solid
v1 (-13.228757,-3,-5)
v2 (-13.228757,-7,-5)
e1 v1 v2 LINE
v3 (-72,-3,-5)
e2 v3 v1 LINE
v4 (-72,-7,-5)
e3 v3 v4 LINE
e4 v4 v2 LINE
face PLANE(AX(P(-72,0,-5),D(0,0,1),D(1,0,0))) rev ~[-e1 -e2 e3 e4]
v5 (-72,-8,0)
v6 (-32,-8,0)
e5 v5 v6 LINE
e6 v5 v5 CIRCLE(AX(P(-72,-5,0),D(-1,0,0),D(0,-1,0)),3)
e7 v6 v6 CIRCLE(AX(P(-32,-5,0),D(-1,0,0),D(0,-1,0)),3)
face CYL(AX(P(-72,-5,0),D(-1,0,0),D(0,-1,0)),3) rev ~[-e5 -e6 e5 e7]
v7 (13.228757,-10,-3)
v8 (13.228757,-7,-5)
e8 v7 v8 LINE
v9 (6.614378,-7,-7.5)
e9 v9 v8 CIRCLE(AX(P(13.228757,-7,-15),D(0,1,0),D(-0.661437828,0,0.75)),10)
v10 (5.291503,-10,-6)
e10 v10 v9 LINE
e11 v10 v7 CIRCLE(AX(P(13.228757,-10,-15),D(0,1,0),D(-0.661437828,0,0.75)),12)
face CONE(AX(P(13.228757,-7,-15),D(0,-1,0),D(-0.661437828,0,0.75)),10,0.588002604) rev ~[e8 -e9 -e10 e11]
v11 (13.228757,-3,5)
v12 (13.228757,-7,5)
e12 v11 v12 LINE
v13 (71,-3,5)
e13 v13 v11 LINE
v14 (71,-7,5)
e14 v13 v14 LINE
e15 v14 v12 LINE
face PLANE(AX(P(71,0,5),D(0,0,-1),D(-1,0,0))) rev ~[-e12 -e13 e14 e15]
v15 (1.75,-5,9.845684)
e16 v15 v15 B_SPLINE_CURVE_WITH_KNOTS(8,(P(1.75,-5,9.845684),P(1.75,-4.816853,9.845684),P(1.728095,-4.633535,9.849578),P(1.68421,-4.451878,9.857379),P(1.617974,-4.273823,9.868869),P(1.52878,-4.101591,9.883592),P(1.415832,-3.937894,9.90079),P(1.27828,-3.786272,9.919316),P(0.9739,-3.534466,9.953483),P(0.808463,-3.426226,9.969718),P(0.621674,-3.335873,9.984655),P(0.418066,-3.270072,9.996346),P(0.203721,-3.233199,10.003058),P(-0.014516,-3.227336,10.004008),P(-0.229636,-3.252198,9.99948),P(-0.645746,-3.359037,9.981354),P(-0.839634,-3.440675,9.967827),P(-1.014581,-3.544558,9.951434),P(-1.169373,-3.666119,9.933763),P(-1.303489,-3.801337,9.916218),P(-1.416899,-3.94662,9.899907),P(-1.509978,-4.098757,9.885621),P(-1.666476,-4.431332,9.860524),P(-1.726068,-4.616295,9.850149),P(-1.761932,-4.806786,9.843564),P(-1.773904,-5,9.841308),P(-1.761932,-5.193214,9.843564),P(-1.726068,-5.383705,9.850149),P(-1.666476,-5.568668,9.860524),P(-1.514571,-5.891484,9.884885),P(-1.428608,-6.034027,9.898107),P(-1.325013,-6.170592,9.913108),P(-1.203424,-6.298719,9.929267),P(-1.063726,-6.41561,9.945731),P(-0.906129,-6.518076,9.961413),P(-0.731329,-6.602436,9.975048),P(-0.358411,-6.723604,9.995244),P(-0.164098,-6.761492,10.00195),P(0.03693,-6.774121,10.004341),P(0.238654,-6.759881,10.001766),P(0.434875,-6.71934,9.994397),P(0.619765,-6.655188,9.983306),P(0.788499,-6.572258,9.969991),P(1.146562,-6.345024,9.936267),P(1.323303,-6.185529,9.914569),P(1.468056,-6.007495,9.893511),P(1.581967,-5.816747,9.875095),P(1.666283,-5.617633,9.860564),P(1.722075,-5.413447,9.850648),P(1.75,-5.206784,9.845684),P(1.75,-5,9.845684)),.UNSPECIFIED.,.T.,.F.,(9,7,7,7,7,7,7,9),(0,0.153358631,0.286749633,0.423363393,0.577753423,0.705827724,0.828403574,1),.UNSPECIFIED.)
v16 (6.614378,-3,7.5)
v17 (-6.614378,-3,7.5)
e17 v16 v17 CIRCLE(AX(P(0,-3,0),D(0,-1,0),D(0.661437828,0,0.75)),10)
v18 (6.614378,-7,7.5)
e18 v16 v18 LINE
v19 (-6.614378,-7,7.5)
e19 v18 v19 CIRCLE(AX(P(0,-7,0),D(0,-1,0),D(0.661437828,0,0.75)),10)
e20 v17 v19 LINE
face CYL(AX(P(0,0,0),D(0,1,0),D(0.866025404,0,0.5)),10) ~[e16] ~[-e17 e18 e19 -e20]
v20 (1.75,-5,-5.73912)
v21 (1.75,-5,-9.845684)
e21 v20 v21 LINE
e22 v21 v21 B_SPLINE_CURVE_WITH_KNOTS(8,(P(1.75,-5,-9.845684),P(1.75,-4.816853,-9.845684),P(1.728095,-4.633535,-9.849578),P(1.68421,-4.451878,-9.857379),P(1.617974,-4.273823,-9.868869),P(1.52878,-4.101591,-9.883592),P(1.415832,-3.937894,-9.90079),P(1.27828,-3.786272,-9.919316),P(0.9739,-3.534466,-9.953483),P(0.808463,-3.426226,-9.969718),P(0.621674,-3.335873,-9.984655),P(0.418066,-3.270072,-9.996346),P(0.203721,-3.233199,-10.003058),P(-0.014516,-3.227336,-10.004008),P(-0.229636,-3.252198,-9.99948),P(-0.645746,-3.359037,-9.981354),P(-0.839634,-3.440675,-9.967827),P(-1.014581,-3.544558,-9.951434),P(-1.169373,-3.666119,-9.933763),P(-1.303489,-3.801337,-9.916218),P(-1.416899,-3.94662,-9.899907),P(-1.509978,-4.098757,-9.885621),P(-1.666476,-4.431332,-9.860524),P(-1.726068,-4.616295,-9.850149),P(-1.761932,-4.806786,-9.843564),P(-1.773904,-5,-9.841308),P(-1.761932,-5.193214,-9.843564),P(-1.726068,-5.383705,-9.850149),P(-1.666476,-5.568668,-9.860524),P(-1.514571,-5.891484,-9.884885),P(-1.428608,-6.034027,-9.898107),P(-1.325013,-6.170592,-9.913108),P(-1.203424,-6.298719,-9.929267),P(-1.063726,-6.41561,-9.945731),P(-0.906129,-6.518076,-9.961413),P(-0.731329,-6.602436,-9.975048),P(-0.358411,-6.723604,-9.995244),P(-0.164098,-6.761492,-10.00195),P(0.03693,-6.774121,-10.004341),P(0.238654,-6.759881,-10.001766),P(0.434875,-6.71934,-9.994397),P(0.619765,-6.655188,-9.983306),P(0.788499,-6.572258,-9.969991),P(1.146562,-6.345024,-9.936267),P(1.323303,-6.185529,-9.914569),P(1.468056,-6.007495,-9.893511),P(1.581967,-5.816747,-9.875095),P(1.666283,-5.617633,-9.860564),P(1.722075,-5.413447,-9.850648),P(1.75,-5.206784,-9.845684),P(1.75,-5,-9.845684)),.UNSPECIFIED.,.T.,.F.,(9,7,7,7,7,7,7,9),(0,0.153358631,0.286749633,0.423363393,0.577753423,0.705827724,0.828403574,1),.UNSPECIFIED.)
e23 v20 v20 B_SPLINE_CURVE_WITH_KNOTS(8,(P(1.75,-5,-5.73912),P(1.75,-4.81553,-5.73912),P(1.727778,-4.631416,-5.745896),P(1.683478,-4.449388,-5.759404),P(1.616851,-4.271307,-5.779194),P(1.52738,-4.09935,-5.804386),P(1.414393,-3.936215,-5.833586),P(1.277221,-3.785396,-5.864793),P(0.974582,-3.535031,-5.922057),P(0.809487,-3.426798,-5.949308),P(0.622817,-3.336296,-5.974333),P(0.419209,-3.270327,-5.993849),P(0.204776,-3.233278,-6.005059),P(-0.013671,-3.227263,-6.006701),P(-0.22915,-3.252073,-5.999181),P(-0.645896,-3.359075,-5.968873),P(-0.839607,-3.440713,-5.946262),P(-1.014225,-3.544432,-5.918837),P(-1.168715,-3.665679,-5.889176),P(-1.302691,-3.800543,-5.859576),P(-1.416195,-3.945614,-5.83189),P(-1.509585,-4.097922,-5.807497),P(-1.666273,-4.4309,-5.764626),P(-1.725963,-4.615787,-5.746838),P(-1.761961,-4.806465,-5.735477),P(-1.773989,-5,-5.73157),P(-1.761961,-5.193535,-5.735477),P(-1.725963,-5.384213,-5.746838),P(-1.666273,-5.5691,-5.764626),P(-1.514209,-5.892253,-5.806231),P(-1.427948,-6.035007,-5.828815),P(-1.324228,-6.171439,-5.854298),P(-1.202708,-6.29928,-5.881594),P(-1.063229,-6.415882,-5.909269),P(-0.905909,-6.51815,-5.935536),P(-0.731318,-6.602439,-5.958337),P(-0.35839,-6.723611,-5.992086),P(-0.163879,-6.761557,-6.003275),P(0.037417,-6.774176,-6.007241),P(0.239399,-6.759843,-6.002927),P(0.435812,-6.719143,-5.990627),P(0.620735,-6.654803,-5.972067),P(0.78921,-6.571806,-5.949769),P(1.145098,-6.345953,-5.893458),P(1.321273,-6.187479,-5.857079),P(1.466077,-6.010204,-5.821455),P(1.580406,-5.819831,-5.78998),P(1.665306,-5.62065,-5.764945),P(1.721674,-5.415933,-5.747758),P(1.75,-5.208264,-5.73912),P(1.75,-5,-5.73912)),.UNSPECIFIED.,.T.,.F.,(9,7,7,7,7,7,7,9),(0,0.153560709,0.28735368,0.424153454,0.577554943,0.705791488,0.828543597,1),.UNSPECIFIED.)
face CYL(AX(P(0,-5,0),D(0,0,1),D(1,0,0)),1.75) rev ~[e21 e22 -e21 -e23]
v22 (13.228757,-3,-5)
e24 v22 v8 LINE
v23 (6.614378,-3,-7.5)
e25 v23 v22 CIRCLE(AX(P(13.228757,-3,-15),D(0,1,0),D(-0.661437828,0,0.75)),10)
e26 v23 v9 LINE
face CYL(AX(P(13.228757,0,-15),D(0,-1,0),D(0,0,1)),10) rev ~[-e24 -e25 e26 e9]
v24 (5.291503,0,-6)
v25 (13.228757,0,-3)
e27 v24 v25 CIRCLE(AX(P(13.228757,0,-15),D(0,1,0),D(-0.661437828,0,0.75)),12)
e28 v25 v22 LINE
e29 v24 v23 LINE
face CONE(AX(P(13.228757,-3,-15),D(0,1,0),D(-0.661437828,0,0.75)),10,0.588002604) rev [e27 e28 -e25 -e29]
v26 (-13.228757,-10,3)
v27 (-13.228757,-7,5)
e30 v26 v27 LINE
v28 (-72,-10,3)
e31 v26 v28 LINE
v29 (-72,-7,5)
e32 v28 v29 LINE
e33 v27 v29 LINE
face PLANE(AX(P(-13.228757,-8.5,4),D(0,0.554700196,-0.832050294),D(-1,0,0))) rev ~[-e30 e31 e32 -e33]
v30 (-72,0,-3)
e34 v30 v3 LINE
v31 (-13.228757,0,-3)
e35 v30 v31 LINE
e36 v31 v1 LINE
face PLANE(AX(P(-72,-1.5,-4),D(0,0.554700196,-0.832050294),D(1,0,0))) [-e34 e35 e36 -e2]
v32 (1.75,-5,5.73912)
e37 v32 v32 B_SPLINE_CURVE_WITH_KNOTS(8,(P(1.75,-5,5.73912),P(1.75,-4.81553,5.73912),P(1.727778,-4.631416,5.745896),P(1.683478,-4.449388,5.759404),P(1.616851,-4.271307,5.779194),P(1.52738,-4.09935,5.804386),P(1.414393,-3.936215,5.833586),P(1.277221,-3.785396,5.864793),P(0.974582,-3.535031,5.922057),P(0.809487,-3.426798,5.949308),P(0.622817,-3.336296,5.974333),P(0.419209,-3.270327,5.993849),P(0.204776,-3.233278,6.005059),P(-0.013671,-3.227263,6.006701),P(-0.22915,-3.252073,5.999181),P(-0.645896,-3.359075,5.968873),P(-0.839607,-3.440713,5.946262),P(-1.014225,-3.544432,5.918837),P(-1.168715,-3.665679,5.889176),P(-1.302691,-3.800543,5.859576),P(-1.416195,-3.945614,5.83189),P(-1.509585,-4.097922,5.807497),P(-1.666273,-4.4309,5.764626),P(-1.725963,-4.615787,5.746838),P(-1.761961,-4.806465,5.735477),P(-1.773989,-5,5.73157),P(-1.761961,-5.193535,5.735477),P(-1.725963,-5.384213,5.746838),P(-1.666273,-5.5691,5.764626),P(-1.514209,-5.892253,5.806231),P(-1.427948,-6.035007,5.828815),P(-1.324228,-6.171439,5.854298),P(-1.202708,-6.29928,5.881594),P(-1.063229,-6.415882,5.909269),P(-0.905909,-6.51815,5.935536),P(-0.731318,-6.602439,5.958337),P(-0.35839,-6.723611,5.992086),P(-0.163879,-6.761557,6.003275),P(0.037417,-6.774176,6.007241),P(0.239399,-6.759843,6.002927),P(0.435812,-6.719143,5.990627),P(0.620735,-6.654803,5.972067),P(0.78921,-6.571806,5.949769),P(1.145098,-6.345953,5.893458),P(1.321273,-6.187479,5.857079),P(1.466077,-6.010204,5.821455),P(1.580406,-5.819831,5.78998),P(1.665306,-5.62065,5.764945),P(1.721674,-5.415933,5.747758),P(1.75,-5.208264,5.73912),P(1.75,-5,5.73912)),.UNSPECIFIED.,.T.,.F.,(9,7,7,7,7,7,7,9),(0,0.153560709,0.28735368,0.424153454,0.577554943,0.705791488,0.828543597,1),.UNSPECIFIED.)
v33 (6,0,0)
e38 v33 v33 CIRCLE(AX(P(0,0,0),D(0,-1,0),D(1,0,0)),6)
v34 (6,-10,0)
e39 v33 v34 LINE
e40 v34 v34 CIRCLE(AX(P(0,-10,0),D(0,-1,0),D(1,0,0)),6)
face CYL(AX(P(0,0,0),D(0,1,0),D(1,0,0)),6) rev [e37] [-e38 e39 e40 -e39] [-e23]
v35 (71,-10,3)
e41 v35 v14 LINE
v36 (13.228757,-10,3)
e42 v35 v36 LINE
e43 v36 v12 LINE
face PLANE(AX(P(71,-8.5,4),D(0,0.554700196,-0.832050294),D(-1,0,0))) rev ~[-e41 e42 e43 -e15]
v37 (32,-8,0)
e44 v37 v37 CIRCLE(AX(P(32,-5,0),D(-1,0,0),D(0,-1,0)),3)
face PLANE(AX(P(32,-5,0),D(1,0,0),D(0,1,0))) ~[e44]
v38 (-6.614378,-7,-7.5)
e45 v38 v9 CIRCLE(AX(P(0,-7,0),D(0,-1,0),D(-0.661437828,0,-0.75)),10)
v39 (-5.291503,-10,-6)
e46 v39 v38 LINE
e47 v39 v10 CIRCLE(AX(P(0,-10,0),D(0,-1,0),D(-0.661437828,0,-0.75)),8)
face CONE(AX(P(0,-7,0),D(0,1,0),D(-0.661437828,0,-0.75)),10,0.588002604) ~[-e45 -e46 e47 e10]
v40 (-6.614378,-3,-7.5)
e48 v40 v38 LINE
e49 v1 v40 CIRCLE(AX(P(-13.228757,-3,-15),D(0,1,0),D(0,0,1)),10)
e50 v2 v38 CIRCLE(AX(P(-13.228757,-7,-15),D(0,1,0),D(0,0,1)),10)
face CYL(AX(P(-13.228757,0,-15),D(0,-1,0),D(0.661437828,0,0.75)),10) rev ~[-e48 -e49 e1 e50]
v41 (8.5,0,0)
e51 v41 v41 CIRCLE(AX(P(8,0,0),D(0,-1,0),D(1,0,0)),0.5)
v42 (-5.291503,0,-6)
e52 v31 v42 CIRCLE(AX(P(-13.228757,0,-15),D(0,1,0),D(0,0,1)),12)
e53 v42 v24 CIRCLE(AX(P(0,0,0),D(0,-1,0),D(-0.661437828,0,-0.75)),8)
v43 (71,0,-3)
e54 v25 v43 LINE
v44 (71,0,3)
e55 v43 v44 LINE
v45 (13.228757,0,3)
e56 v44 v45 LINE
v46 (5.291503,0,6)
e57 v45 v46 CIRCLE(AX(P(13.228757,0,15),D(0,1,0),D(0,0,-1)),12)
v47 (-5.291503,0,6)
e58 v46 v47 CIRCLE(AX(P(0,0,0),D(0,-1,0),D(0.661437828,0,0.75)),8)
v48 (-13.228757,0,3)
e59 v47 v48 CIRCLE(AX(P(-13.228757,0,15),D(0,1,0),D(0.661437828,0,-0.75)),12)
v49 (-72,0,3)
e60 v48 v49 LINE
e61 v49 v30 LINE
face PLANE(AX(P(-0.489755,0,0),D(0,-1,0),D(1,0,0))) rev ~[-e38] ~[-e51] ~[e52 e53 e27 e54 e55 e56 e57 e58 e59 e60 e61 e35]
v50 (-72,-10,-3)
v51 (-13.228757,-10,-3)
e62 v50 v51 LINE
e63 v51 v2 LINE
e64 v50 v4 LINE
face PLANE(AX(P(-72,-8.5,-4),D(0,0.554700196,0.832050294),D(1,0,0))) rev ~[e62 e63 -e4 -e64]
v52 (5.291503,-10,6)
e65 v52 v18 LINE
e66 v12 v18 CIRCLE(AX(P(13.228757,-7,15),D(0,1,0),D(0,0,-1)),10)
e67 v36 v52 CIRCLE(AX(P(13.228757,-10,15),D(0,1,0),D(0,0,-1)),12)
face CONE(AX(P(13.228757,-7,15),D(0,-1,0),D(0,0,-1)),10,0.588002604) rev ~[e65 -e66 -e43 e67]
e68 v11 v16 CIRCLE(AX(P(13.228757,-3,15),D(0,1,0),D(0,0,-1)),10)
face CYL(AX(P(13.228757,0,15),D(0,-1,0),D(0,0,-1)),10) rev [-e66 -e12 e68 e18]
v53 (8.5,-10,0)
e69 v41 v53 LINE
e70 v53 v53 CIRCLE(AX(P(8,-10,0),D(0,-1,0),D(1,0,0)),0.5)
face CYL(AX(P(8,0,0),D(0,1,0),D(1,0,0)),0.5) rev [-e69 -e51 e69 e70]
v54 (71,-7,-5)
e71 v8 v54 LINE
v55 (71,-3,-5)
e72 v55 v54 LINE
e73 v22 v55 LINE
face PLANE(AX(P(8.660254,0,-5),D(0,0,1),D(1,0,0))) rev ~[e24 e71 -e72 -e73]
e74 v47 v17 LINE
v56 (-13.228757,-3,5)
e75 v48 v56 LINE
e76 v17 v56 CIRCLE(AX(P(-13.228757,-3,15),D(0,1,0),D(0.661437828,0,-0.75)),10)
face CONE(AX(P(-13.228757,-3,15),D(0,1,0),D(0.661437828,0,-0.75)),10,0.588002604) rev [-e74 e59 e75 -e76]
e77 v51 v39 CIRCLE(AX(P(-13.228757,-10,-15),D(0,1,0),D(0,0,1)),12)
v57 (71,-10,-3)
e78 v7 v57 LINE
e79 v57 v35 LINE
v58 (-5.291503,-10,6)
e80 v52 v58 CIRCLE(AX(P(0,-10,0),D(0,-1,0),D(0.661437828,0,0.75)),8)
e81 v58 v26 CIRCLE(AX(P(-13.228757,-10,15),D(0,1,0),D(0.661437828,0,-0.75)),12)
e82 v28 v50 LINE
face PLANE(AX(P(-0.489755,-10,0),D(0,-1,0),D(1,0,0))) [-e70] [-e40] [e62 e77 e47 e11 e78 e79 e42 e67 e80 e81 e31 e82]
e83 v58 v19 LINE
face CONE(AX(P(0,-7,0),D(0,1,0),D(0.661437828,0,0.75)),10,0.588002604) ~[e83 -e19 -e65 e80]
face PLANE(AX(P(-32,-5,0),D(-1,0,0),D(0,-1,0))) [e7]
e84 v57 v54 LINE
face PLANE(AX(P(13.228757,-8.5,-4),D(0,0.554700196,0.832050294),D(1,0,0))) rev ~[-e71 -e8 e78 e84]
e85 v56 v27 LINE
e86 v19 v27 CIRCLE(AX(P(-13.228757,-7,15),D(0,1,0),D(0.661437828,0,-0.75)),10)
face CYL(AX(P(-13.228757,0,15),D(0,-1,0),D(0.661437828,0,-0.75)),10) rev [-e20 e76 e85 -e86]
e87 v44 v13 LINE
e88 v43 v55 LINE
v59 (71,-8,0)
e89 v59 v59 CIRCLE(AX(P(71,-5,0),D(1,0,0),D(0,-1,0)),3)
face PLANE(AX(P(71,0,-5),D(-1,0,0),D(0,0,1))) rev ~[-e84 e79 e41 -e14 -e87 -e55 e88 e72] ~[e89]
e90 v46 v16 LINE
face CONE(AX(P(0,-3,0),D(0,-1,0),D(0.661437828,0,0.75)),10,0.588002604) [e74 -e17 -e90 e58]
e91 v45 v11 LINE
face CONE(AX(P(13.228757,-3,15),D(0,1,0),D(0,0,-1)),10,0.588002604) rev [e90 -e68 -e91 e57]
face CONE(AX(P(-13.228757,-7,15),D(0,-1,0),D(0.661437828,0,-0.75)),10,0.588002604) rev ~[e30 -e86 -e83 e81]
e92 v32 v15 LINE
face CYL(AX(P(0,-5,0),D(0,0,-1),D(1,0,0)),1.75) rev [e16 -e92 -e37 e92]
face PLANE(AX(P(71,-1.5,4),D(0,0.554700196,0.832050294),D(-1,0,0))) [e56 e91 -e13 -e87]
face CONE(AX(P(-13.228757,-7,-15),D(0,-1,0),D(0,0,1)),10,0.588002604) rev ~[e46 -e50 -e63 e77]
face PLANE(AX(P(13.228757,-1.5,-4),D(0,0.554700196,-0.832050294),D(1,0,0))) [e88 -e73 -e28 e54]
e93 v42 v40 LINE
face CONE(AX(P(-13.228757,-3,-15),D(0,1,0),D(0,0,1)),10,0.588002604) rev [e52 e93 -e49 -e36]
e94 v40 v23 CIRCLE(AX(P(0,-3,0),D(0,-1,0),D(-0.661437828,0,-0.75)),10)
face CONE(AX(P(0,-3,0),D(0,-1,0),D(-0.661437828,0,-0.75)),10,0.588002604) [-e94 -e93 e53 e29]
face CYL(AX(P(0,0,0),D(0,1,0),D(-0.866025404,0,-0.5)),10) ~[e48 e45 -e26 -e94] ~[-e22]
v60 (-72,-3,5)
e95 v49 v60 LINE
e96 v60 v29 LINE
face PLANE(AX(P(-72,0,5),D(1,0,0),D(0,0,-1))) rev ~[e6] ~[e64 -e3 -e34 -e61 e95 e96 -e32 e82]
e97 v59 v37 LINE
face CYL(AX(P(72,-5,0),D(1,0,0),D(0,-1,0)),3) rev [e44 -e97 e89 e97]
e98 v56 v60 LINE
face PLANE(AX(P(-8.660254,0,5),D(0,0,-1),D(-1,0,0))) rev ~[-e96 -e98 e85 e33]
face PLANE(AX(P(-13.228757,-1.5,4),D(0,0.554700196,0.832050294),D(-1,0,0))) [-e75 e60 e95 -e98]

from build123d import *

# Parameters (mm, degrees)
F0_R          = 6
F0_R_2        = 0.5
F1_DEPTH      = 10
F2_R          = 3
F3_DEPTH      = 40
F4_R          = 1.75
F5_DEPTH      = 10.001
F5_DEPTH_BACK = 10.001
F6_R          = 10
F7_SIZE2      = 3
F7_SIZE       = 2
F7_2_SIZE2    = 3
F7_2_SIZE     = 2


# Not quite as in the source:
# - a pattern or mirror of a feature is missing from the dataset's text; its kind, count and spacing are read off the source's solid


with BuildPart() as f1:
    # F0 (on Front) → F1 (new body)
    with BuildSketch(Plane.XZ):
        with BuildLine():
            Line((71, 5), (8.6602540378, 5))
            ThreePointArc((8.6602540378, 5), (0, 10), (-8.6602540378, 5))
            Line((-8.6602540378, 5), (-72, 5))
            Line((-72, 5), (-72, -5))
            Line((-72, -5), (-8.6602540378, -5))
            ThreePointArc((-8.6602540378, -5), (0, -10), (8.6602540378, -5))
            Line((8.6602540378, -5), (71, -5))
            Line((71, -5), (71, 5))
        make_face()
        Circle(F0_R, mode=Mode.SUBTRACT)
        with Locations((8, 0)):
            Circle(F0_R_2, mode=Mode.SUBTRACT)
    extrude(amount=F1_DEPTH)

    # F2 (on face) → F3 (cut)
    with BuildSketch(Plane(origin=(-72, 0, 0), x_dir=(0, -1, 0), z_dir=(-1, 0, 0))):
        with Locations((5, 0)):
            Circle(F2_R)
    f3 = extrude(amount=-F3_DEPTH, mode=Mode.SUBTRACT)

    # F3_copies: F3 across plane
    add(f3.mirror(Plane(origin=(0, 0, 0), x_dir=(0, 0, 1), z_dir=(1, 0, 0))), mode=Mode.SUBTRACT)

    # F4 (on Top) → F5 (cut, two sides)
    with BuildSketch(Plane.XY) as f5_sk:
        with Locations((0, -5)):
            Circle(F4_R)
    extrude(amount=-F5_DEPTH, mode=Mode.SUBTRACT)
    extrude(f5_sk.sketch, amount=F5_DEPTH_BACK, mode=Mode.SUBTRACT)

    # F6
    f6_edges = [f1.edges().sort_by_distance(p)[0] for p in [
        (-8.660254, -5, 5),
        (8.660254, -5, 5),
        (8.660254, -5, -5),
        (-8.660254, -5, -5),
    ]]
    fillet(f6_edges, radius=F6_R)

    # F7
    f7_edges = [f1.edges().sort_by_distance(p)[0] for p in [
        (-42.614378, -10, 5),
        (-42.614378, -10, -5),
    ]]
    f7_side = f1.faces().sort_by_distance((42.114378, -10, -3.556082))[0]
    chamfer(f7_edges, length=F7_SIZE, length2=F7_SIZE2, reference=f7_side)

    # F7#2
    f7_2_edges = [f1.edges().sort_by_distance(p)[0] for p in [
        (-42.614378, 0, 5),
        (-42.614378, 0, -5),
    ]]
    f7_2_side = f1.faces().sort_by_distance((42.114378, 0, -3.556082))[0]
    chamfer(f7_2_edges, length=F7_2_SIZE, length2=F7_2_SIZE2, reference=f7_2_side)


solid = f1.part
